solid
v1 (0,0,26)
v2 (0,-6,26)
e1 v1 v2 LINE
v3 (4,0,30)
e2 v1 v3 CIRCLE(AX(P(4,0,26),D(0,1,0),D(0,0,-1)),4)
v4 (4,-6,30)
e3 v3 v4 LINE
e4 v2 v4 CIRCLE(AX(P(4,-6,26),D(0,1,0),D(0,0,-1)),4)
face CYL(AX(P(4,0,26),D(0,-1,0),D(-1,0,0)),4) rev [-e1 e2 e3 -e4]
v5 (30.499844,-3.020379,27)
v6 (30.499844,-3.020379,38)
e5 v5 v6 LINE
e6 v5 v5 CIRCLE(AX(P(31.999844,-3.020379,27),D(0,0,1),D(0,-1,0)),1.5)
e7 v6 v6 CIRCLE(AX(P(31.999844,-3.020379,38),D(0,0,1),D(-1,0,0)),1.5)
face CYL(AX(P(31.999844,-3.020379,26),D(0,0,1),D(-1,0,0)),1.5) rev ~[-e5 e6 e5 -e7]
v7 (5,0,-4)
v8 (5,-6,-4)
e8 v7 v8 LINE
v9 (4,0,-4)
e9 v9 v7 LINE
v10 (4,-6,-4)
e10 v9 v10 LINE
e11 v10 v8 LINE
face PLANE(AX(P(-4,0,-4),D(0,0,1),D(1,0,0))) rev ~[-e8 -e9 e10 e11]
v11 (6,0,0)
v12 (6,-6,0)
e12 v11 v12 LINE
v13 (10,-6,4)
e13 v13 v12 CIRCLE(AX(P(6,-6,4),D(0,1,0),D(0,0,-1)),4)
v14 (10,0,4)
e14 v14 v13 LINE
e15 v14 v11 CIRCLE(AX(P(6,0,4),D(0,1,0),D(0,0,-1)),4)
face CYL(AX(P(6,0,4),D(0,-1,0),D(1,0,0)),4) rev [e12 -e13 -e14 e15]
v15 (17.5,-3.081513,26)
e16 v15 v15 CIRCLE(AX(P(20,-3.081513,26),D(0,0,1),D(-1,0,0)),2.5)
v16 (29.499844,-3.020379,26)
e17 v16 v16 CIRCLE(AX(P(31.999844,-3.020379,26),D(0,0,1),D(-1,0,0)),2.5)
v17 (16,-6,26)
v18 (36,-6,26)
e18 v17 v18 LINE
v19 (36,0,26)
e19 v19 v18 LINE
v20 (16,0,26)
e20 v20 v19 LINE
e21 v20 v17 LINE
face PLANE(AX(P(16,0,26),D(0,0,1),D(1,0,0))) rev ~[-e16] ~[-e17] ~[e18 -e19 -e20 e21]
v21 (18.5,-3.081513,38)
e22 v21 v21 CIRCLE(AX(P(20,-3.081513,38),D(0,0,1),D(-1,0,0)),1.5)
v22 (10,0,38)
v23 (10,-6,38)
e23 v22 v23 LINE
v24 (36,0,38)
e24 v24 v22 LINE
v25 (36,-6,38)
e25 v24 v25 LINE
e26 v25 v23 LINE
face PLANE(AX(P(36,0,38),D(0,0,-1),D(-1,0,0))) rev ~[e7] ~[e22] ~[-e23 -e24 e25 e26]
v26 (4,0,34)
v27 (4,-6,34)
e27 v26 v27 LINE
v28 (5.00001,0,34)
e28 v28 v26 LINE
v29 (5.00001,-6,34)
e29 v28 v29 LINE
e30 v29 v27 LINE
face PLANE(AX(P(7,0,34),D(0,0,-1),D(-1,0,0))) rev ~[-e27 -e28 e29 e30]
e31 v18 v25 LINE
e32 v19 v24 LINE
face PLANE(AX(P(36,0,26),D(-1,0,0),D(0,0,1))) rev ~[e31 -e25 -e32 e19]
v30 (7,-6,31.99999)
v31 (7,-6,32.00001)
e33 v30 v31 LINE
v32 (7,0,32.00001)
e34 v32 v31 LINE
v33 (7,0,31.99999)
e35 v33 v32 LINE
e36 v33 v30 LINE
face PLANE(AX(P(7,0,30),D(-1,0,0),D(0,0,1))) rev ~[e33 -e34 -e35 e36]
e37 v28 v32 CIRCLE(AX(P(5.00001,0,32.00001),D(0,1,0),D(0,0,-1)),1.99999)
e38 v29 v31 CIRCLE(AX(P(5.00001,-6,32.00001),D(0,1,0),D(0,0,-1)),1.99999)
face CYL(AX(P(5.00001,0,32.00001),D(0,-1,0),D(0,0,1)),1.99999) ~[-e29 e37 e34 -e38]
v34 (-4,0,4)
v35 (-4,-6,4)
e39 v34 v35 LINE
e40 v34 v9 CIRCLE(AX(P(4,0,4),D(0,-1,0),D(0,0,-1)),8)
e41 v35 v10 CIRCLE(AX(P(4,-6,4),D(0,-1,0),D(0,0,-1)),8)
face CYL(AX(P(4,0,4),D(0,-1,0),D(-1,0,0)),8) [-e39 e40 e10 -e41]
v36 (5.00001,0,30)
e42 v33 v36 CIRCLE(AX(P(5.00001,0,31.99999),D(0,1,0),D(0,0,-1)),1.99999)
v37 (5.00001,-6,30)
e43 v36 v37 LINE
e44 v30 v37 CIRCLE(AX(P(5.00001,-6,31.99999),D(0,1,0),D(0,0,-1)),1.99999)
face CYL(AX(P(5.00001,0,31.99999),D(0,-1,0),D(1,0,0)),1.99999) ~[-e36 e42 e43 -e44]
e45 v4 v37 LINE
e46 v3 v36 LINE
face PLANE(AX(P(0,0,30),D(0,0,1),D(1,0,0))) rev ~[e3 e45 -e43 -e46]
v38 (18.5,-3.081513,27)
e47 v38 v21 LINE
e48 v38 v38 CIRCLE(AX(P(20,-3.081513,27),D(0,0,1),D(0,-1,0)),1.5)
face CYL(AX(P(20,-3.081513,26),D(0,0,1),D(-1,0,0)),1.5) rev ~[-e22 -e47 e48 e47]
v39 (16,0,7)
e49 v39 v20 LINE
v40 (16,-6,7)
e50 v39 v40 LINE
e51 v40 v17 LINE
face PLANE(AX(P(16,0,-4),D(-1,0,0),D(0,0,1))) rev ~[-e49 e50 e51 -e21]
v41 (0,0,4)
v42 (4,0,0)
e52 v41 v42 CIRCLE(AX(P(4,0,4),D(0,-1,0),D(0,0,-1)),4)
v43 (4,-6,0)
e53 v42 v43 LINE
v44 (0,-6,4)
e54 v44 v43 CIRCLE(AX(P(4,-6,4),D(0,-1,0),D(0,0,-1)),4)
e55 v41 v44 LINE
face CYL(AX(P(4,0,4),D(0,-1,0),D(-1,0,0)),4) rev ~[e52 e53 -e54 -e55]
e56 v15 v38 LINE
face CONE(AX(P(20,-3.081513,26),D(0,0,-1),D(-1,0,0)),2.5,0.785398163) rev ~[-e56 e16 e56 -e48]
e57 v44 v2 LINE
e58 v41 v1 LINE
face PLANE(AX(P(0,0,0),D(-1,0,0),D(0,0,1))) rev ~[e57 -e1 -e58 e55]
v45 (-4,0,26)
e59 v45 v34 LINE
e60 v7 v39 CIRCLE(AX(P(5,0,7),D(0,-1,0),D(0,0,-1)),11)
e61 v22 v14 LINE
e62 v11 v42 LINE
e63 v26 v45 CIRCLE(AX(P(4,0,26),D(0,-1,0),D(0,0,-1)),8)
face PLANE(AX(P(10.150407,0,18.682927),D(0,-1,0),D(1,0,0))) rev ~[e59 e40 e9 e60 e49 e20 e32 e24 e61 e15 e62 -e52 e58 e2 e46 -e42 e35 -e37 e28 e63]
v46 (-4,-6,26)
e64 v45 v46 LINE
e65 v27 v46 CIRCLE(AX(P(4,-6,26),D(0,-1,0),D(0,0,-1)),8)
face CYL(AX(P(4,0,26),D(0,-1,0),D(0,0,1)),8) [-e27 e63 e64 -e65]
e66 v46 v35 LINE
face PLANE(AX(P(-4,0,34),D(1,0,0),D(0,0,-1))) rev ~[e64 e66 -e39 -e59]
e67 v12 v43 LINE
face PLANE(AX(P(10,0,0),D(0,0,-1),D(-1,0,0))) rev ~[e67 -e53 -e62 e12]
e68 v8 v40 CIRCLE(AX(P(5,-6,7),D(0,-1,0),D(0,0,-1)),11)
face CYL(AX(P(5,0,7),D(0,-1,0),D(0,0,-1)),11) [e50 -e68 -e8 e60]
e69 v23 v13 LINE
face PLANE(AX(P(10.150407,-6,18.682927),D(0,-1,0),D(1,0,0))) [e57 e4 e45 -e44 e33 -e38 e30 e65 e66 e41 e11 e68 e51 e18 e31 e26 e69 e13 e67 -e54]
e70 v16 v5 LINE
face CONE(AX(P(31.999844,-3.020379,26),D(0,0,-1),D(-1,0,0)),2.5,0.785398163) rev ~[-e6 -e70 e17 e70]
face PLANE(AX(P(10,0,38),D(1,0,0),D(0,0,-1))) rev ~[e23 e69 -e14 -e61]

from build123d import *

# Parameters (mm, degrees)
F1_DEPTH       = 6
F2_R           = 4
F3_R           = 8
F4_R           = 11
F5_R           = 1.99999
F7_D           = 3
F7_CSINK_D     = 5
F7_CSINK_ANGLE = 90


# Not quite as in the source:
# - a fillet or chamfer is up to 0.001 mm smaller than in the source, because OpenCascade refuses the exact size


with BuildPart() as f1:
    # F0 (on Front) → F1 (new body)
    with BuildSketch(Plane.XZ):
        Polygon((0, 0), (0, 30), (7, 30), (7, 34), (-4, 34), (-4, -4), (16, -4), (16, 26), (36, 26), (36, 38), (10, 38), (10, 0), align=None)
    extrude(amount=F1_DEPTH)

    # F2
    f2_edges = [f1.edges().sort_by_distance(p)[0] for p in [
        (10, -3, 0),
        (0, -3, 0),
        (0, -3, 30),
    ]]
    fillet(f2_edges, radius=F2_R)

    # F3
    f3_edges = [f1.edges().sort_by_distance(p)[0] for p in [
        (-4, -3, 34),
        (-4, -3, -4),
    ]]
    fillet(f3_edges, radius=F3_R)

    # F4
    f4_edges = [f1.edges().sort_by_distance(p)[0] for p in [
        (16, -3, -4),
    ]]
    fillet(f4_edges, radius=F4_R)

    # F5 (radius 2 in the source; OpenCascade refuses exactly that, so slightly less here)
    f5_edges = [f1.edges().sort_by_distance(p)[0] for p in [
        (7, -3, 34),
        (7, -3, 30),
    ]]
    fillet(f5_edges, radius=F5_R)

    # F7 (through all)
    with Locations(Plane(origin=(0, 0, 26), x_dir=(1, 0, 0), z_dir=(0, 0, -1))):
        with Locations((20, 3.0815127769), (31.9998442765, 3.0203789876)):
            CounterSinkHole(F7_D / 2, F7_CSINK_D / 2, counter_sink_angle=F7_CSINK_ANGLE)


solid = f1.part
